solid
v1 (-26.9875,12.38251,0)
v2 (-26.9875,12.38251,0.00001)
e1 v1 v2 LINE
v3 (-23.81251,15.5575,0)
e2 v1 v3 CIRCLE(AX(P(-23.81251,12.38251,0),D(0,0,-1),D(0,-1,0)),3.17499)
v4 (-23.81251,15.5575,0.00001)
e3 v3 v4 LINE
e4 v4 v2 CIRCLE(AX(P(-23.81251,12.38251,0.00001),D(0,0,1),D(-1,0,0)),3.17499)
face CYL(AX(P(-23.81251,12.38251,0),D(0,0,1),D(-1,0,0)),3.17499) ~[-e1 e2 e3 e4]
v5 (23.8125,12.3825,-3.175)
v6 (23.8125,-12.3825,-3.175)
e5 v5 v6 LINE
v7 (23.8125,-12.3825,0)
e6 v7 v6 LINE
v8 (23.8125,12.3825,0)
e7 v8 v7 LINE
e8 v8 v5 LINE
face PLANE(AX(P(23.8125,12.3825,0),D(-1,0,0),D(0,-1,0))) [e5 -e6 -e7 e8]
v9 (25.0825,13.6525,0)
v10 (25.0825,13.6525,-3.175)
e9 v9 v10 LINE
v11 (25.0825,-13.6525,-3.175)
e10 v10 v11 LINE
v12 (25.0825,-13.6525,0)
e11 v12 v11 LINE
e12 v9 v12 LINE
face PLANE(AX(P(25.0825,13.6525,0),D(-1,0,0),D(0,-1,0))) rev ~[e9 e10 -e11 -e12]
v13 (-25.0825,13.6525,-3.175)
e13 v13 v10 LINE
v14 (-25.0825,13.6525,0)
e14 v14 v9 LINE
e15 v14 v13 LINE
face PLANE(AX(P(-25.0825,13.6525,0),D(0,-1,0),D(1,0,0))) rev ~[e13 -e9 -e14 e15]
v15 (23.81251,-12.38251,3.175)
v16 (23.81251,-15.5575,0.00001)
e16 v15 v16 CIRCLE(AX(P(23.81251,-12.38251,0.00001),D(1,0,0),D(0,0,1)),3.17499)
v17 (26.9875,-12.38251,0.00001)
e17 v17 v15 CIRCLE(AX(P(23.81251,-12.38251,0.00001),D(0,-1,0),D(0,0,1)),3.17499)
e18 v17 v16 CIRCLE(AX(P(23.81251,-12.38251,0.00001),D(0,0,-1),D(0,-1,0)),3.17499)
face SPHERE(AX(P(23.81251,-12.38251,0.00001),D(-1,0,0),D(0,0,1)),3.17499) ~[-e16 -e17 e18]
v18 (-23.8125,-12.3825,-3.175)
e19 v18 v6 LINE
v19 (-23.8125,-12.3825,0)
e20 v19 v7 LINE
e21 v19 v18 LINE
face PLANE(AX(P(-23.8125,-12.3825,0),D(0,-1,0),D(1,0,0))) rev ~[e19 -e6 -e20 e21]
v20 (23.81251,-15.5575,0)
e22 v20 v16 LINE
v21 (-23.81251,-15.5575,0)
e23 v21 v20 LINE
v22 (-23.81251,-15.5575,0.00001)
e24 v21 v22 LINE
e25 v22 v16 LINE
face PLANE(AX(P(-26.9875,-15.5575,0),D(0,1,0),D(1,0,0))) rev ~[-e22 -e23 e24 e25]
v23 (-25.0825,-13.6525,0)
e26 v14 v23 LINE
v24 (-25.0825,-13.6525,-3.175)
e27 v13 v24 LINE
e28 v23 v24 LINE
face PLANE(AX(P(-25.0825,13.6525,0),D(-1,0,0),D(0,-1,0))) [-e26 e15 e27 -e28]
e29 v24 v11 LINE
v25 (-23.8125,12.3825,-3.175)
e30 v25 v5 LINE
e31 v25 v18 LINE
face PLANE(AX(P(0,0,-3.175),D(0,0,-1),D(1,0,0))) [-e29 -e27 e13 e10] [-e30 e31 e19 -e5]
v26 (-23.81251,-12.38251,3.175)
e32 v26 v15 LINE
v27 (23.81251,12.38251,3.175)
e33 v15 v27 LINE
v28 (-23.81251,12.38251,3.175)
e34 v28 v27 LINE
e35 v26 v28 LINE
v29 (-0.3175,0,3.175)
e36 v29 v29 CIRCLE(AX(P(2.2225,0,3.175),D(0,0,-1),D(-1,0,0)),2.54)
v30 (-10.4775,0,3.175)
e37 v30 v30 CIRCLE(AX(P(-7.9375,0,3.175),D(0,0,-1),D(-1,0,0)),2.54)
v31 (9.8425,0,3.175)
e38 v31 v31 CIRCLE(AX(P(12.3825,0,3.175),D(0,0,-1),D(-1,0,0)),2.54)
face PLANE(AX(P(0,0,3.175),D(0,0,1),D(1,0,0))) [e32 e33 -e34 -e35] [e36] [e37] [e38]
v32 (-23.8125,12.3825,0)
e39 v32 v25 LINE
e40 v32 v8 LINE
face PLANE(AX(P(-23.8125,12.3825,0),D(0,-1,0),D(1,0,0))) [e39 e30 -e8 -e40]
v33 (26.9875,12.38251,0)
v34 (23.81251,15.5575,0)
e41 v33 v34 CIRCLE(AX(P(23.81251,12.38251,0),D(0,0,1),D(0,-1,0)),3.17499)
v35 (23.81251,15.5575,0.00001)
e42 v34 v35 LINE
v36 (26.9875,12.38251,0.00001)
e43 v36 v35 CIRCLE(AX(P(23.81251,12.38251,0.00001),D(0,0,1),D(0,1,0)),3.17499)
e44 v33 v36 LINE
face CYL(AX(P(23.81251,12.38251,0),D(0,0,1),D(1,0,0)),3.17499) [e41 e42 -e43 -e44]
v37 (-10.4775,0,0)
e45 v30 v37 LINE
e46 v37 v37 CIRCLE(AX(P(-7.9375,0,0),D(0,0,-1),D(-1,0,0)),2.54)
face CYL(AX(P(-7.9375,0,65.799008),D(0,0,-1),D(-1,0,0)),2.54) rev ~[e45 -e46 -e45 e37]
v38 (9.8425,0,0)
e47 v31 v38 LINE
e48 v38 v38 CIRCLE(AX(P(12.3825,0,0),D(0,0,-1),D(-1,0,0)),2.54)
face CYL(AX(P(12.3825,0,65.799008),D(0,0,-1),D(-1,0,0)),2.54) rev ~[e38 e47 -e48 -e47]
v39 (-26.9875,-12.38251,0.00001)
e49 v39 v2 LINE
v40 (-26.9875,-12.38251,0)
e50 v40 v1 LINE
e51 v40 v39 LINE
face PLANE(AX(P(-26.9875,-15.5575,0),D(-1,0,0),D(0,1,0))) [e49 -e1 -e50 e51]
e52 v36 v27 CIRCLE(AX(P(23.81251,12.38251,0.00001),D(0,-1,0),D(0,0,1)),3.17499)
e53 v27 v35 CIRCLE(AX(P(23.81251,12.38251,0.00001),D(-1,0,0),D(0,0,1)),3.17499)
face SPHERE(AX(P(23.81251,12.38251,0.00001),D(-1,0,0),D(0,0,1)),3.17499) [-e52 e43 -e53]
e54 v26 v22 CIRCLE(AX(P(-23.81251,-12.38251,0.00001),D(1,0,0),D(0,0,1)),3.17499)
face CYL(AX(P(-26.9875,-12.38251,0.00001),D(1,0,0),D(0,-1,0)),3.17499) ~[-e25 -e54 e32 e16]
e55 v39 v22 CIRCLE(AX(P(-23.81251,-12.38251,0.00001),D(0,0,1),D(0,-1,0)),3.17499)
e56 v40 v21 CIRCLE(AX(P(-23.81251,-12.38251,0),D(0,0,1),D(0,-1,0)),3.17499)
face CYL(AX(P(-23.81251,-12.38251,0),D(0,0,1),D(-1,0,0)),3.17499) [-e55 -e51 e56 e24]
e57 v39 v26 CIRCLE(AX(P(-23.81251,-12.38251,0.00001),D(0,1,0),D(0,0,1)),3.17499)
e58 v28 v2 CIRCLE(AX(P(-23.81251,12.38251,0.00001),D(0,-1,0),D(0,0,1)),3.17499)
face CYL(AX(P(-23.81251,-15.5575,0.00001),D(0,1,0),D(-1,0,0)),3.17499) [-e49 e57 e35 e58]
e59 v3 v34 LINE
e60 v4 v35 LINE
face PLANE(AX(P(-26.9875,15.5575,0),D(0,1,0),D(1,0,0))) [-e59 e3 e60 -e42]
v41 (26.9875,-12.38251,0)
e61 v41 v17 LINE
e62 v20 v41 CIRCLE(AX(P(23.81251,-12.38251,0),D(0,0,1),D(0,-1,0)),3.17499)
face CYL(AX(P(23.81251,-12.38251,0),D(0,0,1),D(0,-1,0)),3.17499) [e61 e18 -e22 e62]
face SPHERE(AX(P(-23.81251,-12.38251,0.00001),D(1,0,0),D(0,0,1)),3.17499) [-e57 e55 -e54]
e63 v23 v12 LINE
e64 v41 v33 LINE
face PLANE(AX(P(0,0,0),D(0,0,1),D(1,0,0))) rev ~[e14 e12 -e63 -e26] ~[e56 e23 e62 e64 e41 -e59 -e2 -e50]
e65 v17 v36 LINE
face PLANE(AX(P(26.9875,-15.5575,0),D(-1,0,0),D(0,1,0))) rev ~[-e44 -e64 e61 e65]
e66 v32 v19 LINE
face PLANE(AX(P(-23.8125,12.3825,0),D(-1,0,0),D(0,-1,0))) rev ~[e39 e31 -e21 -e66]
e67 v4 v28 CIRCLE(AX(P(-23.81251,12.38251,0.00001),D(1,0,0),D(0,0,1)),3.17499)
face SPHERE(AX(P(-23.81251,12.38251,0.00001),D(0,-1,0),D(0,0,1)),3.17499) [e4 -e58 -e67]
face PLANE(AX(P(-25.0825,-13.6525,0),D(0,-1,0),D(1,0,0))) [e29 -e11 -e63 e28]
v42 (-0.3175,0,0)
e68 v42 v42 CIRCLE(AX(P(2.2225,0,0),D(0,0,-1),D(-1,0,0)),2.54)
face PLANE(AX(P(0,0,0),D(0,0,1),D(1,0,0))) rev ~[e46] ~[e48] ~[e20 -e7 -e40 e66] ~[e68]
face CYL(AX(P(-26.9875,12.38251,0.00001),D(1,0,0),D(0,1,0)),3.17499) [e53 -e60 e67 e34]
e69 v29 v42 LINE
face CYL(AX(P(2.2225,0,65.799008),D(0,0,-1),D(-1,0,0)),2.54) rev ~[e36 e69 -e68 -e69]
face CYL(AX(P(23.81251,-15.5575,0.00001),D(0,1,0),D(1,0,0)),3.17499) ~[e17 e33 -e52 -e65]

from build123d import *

# Parameters (mm, degrees)
F0_W     = 53.975
F0_H     = 31.115
F1_DEPTH = 3.175
F2_R     = 3.17499
F3_W     = 50.165
F3_H     = 27.305
F3_W_2   = 47.625
F3_H_2   = 24.765
F4_DEPTH = 3.175
F6_D     = 5.08


# Not quite as in the source:
# - a fillet or chamfer is up to 0.001 mm smaller than in the source, because OpenCascade refuses the exact size


with BuildPart() as f1:
    # F0 (on Top) → F1 (new body)
    with BuildSketch(Plane.XY):
        Rectangle(F0_W, F0_H)
    extrude(amount=F1_DEPTH)

    # F2 (radius 3.175 in the source; OpenCascade refuses exactly that, so slightly less here)
    f2_edges = [f1.edges().sort_by_distance(p)[0] for p in [
        (0, -15.5575, 3.175),
        (-26.9875, 0, 3.175),
        (0, 15.5575, 3.175),
        (26.9875, 0, 3.175),
        (26.9875, -15.5575, 1.5875),
        (26.9875, 15.5575, 1.5875),
        (-26.9875, 15.5575, 1.5875),
        (-26.9875, -15.5575, 1.5875),
    ]]
    fillet(f2_edges, radius=F2_R)

    # F3 (on face) → F4 (join)
    with BuildSketch(Plane(origin=(0, 0, 0), x_dir=(1, 0, 0), z_dir=(0, 0, -1))):
        Rectangle(F3_W, F3_H)
        Rectangle(F3_W_2, F3_H_2, mode=Mode.SUBTRACT)
    extrude(amount=F4_DEPTH)

    # F6 (through all)
    with Locations(Plane.XY.offset(3.175)):
        with Locations((-7.9375, 0), (2.2225, 0), (12.3825, 0)):
            Hole(F6_D / 2)


solid = f1.part
